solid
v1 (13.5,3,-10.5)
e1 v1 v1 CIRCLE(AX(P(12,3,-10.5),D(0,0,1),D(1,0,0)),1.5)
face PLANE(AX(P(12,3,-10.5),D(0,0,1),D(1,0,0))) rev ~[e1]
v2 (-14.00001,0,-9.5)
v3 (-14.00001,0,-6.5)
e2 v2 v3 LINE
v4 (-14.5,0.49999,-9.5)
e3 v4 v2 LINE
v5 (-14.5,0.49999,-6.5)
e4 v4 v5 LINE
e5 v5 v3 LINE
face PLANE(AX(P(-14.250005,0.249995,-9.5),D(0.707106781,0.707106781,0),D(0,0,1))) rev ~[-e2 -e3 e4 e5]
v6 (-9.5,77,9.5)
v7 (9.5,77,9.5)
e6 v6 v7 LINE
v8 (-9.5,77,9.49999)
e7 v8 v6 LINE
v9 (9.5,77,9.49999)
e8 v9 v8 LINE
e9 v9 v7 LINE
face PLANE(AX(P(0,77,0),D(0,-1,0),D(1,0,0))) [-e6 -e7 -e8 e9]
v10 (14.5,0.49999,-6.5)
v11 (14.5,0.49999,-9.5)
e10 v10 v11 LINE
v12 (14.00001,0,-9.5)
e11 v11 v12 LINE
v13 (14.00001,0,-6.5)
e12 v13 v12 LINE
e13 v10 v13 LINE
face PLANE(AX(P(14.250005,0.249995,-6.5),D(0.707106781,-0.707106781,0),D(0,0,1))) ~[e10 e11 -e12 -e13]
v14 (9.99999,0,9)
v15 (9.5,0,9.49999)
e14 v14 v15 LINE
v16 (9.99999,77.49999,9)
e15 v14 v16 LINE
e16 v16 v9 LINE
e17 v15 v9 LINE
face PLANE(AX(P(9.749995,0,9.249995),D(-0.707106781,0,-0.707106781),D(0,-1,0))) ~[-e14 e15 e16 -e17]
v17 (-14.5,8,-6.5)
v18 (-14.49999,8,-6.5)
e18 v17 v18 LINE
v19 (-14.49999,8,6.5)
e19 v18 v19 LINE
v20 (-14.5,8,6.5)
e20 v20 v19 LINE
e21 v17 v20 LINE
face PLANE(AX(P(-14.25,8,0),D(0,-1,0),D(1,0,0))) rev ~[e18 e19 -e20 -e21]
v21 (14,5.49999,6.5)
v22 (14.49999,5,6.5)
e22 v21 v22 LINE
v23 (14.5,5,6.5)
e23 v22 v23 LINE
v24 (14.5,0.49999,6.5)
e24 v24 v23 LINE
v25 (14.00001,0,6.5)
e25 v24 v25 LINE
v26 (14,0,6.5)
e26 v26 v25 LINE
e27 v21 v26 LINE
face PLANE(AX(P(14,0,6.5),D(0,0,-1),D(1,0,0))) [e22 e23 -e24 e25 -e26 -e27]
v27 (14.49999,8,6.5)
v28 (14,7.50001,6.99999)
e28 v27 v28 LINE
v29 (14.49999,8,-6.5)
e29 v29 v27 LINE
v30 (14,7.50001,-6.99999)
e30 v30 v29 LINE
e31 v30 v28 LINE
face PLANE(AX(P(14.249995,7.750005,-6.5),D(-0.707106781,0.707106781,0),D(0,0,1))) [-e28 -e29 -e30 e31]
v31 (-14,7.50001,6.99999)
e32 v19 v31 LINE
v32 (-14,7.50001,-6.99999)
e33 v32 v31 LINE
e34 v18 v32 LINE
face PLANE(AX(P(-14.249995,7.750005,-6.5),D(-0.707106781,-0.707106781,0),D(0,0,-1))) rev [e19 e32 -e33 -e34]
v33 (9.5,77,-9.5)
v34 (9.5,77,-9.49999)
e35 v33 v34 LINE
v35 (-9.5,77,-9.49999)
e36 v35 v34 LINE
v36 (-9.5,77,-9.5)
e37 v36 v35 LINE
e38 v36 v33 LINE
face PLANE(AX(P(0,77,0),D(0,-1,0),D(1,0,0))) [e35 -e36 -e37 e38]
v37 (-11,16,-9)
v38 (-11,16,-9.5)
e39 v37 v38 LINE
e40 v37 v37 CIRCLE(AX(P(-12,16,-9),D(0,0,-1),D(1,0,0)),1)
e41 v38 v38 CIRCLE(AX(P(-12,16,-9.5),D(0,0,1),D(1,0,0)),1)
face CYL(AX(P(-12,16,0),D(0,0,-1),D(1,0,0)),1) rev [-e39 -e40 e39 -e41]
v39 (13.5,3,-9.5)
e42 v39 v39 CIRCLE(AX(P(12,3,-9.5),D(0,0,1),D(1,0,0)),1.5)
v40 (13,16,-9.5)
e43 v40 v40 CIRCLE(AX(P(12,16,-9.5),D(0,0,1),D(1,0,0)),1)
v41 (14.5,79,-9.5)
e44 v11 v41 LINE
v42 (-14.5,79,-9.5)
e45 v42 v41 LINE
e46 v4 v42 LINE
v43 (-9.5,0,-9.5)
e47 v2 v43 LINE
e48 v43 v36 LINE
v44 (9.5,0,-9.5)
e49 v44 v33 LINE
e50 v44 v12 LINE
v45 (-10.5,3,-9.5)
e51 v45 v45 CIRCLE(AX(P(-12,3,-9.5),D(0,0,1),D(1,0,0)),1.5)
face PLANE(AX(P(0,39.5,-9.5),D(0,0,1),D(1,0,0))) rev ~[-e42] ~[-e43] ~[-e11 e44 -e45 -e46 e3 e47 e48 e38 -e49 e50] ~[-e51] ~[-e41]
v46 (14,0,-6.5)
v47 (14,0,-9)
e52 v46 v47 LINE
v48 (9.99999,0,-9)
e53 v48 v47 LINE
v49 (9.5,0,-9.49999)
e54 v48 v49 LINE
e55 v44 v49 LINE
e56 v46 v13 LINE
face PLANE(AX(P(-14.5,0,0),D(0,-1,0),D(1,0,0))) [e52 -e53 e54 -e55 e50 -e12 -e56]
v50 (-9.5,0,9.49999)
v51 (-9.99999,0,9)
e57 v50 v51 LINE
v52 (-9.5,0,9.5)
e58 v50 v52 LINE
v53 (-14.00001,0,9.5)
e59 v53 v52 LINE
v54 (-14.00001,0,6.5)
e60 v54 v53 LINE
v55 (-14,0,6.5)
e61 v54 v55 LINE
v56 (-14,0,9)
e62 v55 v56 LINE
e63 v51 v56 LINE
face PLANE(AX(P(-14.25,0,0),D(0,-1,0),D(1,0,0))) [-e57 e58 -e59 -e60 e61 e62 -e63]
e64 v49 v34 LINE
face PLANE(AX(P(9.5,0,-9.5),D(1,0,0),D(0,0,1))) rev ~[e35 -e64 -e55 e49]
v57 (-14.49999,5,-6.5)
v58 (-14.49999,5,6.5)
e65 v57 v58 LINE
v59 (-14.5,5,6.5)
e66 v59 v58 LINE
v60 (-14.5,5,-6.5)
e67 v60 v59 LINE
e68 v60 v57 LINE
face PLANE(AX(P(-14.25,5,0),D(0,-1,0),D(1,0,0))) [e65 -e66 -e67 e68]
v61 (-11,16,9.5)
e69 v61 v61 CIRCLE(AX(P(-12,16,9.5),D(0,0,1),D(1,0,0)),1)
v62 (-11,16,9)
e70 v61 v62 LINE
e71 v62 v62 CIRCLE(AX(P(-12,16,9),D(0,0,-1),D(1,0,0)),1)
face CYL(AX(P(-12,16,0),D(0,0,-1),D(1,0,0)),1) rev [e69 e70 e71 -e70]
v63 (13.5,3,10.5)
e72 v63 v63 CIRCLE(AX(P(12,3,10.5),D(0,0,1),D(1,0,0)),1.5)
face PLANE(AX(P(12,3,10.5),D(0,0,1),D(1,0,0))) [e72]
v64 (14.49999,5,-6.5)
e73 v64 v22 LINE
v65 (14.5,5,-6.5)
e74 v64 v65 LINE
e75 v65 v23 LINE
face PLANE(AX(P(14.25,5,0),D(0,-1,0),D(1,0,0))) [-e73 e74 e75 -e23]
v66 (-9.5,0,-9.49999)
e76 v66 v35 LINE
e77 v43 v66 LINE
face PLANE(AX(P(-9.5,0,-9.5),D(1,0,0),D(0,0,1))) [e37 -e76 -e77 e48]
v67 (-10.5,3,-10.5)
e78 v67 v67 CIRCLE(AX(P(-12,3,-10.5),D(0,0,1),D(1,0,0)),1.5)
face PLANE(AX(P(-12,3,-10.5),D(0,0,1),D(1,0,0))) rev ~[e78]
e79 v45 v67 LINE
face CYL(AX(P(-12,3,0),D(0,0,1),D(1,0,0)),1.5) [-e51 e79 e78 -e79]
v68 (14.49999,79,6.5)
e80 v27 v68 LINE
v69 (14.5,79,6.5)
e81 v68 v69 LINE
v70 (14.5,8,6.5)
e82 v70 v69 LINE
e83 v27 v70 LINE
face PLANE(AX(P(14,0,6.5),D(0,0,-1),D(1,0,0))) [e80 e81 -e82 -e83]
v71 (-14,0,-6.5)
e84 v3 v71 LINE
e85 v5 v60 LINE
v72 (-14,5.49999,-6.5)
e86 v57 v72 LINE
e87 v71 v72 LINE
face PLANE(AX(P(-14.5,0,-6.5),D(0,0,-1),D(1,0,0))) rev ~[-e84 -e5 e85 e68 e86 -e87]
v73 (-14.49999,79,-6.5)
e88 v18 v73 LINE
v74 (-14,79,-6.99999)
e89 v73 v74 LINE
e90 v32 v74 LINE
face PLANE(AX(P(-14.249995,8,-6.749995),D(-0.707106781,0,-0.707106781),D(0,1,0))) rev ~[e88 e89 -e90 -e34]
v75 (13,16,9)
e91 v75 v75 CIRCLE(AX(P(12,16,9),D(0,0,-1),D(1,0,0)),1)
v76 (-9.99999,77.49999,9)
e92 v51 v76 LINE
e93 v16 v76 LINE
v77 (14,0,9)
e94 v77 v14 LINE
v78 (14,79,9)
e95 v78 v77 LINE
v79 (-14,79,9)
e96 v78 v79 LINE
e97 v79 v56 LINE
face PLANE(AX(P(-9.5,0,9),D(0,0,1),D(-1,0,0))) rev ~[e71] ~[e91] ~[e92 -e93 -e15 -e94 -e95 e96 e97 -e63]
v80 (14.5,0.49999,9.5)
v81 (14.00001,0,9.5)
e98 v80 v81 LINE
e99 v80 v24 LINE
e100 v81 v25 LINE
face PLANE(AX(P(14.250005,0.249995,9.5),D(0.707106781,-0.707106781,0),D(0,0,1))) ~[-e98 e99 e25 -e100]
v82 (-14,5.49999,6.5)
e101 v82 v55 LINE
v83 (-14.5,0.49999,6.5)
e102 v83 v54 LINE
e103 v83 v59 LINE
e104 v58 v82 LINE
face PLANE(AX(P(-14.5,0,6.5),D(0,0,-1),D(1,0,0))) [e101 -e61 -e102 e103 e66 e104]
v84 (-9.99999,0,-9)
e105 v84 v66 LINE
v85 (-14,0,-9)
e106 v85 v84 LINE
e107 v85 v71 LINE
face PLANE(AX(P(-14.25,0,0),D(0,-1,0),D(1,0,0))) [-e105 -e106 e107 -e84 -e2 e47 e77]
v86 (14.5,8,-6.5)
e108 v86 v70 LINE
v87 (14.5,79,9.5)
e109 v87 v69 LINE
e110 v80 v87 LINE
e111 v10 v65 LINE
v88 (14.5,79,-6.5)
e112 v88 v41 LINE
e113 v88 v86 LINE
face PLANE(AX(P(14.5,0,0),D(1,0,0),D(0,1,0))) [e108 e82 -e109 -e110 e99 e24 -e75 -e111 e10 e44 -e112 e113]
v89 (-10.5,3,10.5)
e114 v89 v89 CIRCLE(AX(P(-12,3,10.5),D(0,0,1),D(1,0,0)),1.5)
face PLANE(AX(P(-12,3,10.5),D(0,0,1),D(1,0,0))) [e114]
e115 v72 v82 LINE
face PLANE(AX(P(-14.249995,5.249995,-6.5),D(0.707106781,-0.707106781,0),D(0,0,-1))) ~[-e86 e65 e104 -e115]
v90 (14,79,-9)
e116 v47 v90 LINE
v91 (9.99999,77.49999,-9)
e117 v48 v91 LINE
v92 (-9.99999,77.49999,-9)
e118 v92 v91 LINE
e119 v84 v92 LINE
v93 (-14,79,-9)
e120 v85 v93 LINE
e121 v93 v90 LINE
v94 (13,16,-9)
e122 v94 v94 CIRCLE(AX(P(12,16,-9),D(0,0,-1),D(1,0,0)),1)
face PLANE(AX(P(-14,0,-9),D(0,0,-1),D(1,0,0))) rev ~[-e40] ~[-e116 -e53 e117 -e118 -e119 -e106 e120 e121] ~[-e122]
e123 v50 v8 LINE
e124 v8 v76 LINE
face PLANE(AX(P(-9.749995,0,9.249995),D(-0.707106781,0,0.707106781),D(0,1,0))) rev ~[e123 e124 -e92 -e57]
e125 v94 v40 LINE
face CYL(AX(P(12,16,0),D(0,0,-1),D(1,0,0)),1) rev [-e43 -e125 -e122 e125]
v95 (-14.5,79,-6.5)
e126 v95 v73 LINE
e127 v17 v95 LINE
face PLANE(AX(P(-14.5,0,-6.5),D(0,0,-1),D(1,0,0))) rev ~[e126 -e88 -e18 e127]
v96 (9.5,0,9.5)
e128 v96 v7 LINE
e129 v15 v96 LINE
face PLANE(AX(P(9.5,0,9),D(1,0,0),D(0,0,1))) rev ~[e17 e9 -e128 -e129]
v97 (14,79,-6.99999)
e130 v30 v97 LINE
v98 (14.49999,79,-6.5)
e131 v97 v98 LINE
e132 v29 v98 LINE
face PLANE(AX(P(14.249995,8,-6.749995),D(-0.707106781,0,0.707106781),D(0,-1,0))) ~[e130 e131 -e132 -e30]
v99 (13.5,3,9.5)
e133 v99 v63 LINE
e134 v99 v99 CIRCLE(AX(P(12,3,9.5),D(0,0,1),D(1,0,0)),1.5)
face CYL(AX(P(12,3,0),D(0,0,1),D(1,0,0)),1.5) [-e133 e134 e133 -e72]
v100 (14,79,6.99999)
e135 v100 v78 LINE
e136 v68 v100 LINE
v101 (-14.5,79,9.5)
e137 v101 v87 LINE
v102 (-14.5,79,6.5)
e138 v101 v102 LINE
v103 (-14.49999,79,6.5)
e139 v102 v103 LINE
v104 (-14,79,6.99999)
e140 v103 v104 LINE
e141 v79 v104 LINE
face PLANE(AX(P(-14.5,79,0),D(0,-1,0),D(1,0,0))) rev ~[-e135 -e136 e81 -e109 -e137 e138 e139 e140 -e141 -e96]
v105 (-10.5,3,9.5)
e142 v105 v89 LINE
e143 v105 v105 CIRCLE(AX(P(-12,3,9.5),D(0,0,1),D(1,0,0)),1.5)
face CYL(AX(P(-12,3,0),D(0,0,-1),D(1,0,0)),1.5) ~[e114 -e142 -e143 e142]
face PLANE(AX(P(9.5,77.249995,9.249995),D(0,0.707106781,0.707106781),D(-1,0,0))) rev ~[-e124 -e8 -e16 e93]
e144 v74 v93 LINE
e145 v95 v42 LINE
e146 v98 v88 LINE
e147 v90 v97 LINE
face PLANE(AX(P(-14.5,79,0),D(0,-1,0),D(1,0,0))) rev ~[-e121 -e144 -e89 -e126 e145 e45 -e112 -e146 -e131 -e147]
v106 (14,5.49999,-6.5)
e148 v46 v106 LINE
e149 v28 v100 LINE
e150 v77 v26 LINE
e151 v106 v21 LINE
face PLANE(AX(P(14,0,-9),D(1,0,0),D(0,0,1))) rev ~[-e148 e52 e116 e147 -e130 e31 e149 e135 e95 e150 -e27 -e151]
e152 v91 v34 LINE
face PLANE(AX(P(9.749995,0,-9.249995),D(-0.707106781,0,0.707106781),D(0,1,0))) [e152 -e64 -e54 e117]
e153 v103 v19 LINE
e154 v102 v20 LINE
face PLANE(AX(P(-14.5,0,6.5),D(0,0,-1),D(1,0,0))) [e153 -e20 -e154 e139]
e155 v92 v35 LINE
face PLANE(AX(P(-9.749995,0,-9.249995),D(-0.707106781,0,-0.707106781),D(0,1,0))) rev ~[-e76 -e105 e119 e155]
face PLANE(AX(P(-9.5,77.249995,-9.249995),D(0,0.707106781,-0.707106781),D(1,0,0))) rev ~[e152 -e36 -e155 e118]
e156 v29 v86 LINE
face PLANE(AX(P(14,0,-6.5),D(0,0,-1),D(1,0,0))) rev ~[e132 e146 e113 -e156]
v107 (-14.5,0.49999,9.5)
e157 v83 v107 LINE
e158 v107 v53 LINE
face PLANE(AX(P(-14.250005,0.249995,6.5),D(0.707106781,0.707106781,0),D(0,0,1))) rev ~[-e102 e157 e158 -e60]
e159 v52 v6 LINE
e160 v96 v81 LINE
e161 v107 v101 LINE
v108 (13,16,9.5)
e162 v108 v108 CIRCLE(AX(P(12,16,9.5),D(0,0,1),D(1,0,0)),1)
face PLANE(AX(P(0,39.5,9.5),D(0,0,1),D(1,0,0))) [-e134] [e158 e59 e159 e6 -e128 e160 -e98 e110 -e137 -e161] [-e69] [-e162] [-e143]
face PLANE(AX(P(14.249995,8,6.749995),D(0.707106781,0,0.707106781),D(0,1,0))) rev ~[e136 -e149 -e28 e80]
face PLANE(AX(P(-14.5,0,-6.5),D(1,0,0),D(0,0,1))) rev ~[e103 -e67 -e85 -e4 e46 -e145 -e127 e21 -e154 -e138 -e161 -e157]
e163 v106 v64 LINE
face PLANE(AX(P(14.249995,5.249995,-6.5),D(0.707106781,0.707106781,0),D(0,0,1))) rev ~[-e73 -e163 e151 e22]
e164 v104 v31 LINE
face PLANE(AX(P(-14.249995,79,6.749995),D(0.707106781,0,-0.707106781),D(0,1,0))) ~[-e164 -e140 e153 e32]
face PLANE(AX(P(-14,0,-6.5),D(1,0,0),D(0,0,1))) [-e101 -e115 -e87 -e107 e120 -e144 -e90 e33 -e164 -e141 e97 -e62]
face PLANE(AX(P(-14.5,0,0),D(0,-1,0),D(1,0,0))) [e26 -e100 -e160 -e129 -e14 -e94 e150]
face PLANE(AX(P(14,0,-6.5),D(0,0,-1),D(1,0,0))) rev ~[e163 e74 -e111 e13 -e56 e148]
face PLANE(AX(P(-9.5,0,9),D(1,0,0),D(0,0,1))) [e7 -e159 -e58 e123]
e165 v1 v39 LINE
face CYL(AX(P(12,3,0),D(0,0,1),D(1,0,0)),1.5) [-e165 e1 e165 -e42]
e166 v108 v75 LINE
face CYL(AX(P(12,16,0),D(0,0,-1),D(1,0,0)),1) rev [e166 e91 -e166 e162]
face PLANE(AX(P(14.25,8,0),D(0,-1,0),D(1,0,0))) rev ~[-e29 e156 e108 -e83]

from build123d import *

# Parameters (mm, degrees)
F0_W     = 29
F0_H     = 79
F0_R     = 1.5
F0_R_2   = 1
F1_DEPTH = 9.5
F2_DEPTH = 10.5
F3_W     = 0.5
F3_H     = 13
F3_W_2   = 19
F3_H_2   = 0.5
F4_DEPTH = 77
F5_DEPTH = 79
F6_DEPTH = 8
F7_DEPTH = 5
F8_SIZE2 = 0.49999
F8_SIZE  = 0.49999


# Not quite as in the source:
# - a fillet or chamfer is up to 0.001 mm smaller than in the source, because OpenCascade refuses the exact size


with BuildPart() as f1:
    # F0 (on Top) → F1 (new body, symmetric)
    with BuildSketch(Plane.XY):
        with Locations((0, 39.5)):
            Rectangle(F0_W, F0_H)
        with Locations((-12, 3)):
            Circle(F0_R, mode=Mode.SUBTRACT)
        with Locations((-12, 16)):
            Circle(F0_R_2, mode=Mode.SUBTRACT)
        with Locations((12, 3)):
            Circle(F0_R, mode=Mode.SUBTRACT)
        with Locations((12, 16)):
            Circle(F0_R_2, mode=Mode.SUBTRACT)
    extrude(amount=F1_DEPTH, both=True)

    # F0 (on Top) → F2 (join, symmetric)
    with BuildSketch(Plane.XY):
        with Locations((-12, 3)):
            Circle(F0_R)
        with Locations((12, 3)):
            Circle(F0_R)
    extrude(amount=F2_DEPTH, both=True)

    # F3 (on Front) → F4 (cut)
    with BuildSketch(Plane.XZ):
        Polygon((9.5, 9), (-9.5, 9), (-14, 9), (-14, 6.5), (-14, -6.5), (-14, -9), (-9.5, -9), (9.5, -9), (14, -9), (14, -6.5), (14, 6.5), (14, 9), align=None)
        with Locations((-14.25, 0)):
            Rectangle(F3_W, F3_H)
        with Locations((0, 9.25)):
            Rectangle(F3_W_2, F3_H_2)
        with Locations((14.25, 0)):
            Rectangle(F3_W, F3_H)
        with Locations((0, -9.25)):
            Rectangle(F3_W_2, F3_H_2)
    extrude(amount=-F4_DEPTH, mode=Mode.SUBTRACT)

    # F3 (on Front) → F5 (cut)
    with BuildSketch(Plane.XZ):
        Polygon((9.5, 9), (-9.5, 9), (-14, 9), (-14, 6.5), (-14, -6.5), (-14, -9), (-9.5, -9), (9.5, -9), (14, -9), (14, -6.5), (14, 6.5), (14, 9), align=None)
        with Locations((-14.25, 0)):
            Rectangle(F3_W, F3_H)
        with Locations((14.25, 0)):
            Rectangle(F3_W, F3_H)
    extrude(amount=-F5_DEPTH, mode=Mode.SUBTRACT)

    # F3 (on Front) → F6 (join)
    with BuildSketch(Plane.XZ):
        with Locations((-14.25, 0)):
            Rectangle(F3_W, F3_H)
        with Locations((14.25, 0)):
            Rectangle(F3_W, F3_H)
    extrude(amount=-F6_DEPTH)

    # F3 (on Front) → F7 (cut)
    with BuildSketch(Plane.XZ):
        with Locations((-14.25, 0)):
            Rectangle(F3_W, F3_H)
        with Locations((14.25, 0)):
            Rectangle(F3_W, F3_H)
    extrude(amount=-F7_DEPTH, mode=Mode.SUBTRACT)

    # F8 (size 0.5 and 0.5 in the source; OpenCascade refuses exactly that, so slightly less here)
    f8_edges = [f1.edges().sort_by_distance(p)[0] for p in [
        (-9.5, 38.5, -9),
        (9.5, 38.5, -9),
        (14, 43.5, -6.5),
        (-14, 43.5, -6.5),
        (14, 43.5, 6.5),
        (9.5, 38.5, 9),
        (-14, 43.5, 6.5),
        (-9.5, 38.5, 9),
        (14.5, 0, -8),
        (14.5, 0, 8),
        (-14.5, 0, -8),
        (-14.5, 0, 8),
        (-14, 5, 0),
        (14, 5, 0),
        (-14, 8, 0),
        (14, 8, 0),
        (0, 77, -9),
        (0, 77, 9),
    ]]
    chamfer(f8_edges, length=F8_SIZE, length2=F8_SIZE2)


solid = f1.part
